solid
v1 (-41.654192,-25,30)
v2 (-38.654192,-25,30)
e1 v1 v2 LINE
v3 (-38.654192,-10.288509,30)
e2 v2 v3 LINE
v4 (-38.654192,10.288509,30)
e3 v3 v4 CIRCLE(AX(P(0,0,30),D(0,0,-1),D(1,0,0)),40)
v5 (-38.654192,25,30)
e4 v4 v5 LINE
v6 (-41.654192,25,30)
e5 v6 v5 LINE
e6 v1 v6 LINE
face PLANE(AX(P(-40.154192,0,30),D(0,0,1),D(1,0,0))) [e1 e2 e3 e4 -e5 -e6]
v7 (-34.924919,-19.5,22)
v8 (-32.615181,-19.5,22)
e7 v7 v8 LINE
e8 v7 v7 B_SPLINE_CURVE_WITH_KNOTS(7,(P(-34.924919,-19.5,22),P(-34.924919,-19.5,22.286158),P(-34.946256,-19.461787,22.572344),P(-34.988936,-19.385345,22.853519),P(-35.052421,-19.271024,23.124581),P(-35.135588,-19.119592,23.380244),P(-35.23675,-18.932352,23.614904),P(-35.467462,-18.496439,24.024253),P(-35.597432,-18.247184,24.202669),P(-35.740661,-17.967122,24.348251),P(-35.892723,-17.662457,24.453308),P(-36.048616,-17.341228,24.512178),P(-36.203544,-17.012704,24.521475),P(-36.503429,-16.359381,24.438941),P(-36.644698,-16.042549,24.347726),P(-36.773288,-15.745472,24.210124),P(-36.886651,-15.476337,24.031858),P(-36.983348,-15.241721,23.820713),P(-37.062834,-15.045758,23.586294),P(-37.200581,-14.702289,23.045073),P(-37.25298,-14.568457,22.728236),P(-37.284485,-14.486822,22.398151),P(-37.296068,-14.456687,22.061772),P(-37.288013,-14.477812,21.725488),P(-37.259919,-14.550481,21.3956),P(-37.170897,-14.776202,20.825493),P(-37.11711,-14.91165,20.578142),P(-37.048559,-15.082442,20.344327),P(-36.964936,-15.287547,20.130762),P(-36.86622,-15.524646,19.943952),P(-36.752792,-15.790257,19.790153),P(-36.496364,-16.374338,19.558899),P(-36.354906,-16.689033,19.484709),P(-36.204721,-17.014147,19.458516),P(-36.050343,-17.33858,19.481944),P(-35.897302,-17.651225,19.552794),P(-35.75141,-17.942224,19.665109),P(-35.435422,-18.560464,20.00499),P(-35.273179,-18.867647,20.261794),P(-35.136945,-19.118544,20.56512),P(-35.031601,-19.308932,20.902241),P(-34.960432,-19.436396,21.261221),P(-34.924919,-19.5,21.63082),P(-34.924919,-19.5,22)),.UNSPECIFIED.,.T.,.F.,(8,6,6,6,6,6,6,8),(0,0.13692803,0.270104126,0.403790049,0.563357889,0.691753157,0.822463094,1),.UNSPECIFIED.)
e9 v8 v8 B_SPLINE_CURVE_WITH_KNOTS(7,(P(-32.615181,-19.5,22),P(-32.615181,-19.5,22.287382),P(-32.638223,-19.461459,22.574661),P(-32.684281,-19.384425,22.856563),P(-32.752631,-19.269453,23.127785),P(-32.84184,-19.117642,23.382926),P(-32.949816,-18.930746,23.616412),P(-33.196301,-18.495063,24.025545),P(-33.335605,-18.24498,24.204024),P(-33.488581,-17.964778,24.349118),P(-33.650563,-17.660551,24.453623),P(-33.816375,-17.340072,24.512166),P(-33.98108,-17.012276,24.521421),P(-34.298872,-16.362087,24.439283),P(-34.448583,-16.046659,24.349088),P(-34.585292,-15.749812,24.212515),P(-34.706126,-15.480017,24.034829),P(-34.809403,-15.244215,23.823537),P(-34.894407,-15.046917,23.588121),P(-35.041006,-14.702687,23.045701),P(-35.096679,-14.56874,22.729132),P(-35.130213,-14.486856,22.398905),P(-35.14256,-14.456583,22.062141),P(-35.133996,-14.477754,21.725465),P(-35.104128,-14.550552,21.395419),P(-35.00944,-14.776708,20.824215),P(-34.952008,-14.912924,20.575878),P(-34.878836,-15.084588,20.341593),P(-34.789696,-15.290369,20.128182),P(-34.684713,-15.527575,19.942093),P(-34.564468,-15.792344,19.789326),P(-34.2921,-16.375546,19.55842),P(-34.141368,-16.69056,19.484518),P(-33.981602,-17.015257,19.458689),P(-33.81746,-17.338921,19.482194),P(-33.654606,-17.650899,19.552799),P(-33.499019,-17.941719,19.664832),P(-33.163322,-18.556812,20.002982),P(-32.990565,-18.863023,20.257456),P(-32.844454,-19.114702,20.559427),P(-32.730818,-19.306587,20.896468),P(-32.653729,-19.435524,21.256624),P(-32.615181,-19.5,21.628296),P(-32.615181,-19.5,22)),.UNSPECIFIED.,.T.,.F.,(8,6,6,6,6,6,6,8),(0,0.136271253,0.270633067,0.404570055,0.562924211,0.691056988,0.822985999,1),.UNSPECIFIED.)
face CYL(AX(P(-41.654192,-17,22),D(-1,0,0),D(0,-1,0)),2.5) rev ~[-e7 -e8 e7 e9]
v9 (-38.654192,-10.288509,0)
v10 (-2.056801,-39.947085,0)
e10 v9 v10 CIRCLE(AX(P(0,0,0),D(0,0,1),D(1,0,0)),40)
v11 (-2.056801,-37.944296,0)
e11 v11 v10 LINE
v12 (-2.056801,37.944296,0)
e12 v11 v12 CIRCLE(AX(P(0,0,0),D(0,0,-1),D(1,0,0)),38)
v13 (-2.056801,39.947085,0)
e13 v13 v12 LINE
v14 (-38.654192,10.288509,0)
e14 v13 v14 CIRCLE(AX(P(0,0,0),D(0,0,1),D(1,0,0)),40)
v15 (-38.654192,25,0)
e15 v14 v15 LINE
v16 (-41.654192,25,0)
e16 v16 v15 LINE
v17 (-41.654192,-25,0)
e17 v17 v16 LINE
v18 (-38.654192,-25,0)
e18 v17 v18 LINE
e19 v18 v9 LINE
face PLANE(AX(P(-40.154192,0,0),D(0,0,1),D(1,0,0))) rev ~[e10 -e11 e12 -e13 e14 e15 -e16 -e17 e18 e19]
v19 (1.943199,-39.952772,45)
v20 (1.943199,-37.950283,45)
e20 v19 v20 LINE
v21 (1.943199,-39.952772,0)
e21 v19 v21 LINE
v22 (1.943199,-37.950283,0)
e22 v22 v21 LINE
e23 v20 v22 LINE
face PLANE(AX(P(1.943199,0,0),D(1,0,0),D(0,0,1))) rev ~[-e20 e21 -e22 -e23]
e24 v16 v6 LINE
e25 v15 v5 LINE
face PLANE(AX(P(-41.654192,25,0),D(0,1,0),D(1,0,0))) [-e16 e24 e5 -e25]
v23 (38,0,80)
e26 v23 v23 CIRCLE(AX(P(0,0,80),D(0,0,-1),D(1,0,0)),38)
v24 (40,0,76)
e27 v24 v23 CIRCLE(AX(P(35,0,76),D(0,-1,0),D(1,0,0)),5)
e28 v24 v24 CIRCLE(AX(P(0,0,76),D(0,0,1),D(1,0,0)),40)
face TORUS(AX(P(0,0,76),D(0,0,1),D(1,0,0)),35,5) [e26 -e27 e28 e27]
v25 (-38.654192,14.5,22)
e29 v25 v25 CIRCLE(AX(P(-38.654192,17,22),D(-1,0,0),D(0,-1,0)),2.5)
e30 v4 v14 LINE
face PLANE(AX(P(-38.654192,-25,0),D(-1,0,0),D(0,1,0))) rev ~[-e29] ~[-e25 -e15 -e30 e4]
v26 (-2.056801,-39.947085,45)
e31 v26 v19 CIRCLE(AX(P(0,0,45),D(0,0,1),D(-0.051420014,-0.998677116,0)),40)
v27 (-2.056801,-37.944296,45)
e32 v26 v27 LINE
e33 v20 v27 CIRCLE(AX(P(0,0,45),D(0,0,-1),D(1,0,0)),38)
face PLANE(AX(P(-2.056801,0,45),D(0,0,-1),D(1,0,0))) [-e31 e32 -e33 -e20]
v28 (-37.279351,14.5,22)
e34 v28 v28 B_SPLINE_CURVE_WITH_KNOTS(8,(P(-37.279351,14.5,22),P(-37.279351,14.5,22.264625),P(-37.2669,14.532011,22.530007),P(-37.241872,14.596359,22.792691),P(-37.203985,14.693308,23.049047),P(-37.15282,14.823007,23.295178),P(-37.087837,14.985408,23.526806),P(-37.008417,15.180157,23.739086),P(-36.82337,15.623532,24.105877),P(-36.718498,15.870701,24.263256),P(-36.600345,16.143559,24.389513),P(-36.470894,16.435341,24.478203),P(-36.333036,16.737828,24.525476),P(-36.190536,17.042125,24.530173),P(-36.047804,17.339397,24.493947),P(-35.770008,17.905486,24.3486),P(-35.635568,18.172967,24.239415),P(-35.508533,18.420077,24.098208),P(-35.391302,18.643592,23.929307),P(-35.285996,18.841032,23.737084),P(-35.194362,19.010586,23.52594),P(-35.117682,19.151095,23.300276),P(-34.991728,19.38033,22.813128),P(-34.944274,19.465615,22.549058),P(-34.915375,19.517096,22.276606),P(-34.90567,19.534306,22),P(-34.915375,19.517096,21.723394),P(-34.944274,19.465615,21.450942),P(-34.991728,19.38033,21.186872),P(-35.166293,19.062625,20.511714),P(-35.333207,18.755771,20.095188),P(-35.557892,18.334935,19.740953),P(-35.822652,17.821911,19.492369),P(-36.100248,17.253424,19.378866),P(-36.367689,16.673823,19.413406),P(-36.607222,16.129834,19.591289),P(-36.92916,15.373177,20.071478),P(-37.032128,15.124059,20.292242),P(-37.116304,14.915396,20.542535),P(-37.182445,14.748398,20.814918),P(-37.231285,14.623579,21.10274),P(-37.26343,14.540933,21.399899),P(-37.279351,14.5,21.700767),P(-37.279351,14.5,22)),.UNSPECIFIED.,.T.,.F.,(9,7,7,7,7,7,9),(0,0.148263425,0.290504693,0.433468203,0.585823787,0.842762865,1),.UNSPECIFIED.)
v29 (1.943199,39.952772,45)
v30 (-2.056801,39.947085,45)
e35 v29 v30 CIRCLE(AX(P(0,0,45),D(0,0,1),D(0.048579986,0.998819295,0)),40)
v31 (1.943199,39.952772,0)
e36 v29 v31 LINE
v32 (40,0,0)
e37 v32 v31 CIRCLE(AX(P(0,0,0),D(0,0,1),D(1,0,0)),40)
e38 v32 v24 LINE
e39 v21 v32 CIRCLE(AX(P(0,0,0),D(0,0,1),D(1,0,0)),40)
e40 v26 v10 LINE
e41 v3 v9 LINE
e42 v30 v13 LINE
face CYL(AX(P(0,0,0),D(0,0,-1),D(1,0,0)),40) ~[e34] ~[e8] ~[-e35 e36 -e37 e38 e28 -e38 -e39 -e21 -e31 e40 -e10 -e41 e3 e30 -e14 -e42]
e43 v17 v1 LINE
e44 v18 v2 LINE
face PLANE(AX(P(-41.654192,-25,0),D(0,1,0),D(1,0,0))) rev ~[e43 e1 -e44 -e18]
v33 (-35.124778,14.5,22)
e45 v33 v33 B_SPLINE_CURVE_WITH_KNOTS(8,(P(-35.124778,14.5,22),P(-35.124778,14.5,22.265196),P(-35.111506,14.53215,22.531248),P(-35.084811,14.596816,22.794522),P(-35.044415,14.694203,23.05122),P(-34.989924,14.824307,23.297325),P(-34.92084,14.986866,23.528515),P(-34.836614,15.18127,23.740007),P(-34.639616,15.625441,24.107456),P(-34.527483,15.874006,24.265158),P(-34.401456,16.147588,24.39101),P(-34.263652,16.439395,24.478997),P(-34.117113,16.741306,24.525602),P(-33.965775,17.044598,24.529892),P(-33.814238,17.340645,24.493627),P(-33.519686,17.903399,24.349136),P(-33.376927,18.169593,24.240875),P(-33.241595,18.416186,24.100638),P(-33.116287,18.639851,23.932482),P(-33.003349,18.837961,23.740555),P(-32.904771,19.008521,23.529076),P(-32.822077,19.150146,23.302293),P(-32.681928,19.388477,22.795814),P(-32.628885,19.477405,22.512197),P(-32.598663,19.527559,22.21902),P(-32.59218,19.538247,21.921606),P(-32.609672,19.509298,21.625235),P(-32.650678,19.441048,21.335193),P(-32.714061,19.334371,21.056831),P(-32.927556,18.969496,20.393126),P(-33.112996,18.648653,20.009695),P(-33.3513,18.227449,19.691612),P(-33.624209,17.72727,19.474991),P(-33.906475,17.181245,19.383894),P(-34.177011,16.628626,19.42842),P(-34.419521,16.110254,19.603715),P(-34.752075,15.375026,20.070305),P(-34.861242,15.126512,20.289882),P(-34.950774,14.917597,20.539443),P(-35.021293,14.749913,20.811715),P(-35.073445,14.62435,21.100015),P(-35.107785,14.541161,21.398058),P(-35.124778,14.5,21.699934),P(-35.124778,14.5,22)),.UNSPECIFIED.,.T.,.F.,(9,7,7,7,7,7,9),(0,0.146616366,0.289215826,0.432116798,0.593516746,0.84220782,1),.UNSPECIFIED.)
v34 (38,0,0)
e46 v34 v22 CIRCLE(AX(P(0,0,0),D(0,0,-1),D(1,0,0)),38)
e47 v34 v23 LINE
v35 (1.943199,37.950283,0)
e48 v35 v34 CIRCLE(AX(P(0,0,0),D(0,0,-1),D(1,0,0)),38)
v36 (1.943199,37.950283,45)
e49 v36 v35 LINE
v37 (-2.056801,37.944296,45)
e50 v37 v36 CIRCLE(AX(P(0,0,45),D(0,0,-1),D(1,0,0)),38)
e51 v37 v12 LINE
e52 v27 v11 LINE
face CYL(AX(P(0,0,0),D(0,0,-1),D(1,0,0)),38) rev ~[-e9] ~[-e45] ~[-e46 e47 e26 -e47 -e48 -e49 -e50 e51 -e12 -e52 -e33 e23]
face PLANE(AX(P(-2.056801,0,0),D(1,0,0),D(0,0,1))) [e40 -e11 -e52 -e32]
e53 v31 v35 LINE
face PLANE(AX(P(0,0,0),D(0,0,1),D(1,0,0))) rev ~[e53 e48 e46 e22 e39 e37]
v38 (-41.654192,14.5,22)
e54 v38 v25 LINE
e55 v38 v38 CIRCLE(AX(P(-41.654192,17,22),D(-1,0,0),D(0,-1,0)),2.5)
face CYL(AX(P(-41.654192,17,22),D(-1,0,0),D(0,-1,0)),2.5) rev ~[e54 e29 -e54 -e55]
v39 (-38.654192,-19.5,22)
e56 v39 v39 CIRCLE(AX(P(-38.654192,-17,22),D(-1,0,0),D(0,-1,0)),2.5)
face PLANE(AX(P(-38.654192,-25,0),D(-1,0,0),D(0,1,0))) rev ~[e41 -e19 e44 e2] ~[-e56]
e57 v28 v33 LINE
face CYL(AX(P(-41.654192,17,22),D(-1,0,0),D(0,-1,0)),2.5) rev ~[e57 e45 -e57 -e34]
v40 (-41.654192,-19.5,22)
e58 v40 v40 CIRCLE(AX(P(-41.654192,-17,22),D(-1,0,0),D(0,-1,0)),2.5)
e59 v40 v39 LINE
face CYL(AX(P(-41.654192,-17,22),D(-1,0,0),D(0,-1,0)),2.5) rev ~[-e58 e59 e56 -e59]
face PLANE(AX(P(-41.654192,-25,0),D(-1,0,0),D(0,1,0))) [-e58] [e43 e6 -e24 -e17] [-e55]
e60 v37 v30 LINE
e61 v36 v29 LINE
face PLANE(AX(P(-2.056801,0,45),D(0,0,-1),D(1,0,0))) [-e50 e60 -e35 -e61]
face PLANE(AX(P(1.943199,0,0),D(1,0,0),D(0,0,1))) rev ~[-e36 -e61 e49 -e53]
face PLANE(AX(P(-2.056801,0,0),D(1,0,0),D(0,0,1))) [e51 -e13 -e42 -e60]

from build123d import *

# Parameters (mm, degrees)
F0_R      = 40
F1_DEPTH  = 80
F2_R      = 38
F3_DEPTH  = 90
F5_W      = 4
F5_H      = 45
F6_DEPTH  = 40
F7_W      = 3
F7_H      = 50
F8_DEPTH  = 30
F9_R      = 2.5
F10_DEPTH = 30


# Not quite as in the source:
# - a fillet or chamfer that OpenCascade refuses, or shapes differently, is made with other operations: its cross-section is extruded or revolved along the edge and cut away or added


with BuildPart() as f1:
    # F0 (on Top) → F1 (new body)
    with BuildSketch(Plane.XY):
        Circle(F0_R)
    extrude(amount=F1_DEPTH)

    # F2 (on face) → F3 (cut)
    with BuildSketch(Plane(origin=(0, 0, 0), x_dir=(1, 0, 0), z_dir=(0, 0, -1))):
        Circle(F2_R)
    extrude(amount=-F3_DEPTH, mode=Mode.SUBTRACT)

    # F4: fillet of radius 5 on 1 edges, made by hand

    # F4_s1 → F4_t2 (revolve, cut)
    with BuildSketch(Plane.XZ):
        with BuildLine():
            ThreePointArc((40, 76), (39.472135955, 78.2360679775), (38, 80))
            Line((38, 80), (40, 80))
            Line((40, 80), (40, 76))
        make_face()
    revolve(axis=Axis((0, 0, 80), (0, 0, 1)), mode=Mode.SUBTRACT)

    # F5 (on Front) → F6 (cut, symmetric)
    with BuildSketch(Plane.XZ):
        with Locations((-0.0568005547, 22.5)):
            Rectangle(F5_W, F5_H)
    extrude(amount=F6_DEPTH, both=True, mode=Mode.SUBTRACT)

    # F7 (on Top) → F8 (join)
    with BuildSketch(Plane.XY):
        with Locations((-40.154192288, 0)):
            Rectangle(F7_W, F7_H)
    extrude(amount=F8_DEPTH)

    # F9 (on face) → F10 (cut)
    with BuildSketch(Plane(origin=(-41.654192288, 0, 0), x_dir=(0, -1, 0), z_dir=(-1, 0, 0))):
        with Locations((-17, 22)):
            Circle(F9_R)
        with Locations((17, 22)):
            Circle(F9_R)
    extrude(amount=-F10_DEPTH, mode=Mode.SUBTRACT)


solid = f1.part
